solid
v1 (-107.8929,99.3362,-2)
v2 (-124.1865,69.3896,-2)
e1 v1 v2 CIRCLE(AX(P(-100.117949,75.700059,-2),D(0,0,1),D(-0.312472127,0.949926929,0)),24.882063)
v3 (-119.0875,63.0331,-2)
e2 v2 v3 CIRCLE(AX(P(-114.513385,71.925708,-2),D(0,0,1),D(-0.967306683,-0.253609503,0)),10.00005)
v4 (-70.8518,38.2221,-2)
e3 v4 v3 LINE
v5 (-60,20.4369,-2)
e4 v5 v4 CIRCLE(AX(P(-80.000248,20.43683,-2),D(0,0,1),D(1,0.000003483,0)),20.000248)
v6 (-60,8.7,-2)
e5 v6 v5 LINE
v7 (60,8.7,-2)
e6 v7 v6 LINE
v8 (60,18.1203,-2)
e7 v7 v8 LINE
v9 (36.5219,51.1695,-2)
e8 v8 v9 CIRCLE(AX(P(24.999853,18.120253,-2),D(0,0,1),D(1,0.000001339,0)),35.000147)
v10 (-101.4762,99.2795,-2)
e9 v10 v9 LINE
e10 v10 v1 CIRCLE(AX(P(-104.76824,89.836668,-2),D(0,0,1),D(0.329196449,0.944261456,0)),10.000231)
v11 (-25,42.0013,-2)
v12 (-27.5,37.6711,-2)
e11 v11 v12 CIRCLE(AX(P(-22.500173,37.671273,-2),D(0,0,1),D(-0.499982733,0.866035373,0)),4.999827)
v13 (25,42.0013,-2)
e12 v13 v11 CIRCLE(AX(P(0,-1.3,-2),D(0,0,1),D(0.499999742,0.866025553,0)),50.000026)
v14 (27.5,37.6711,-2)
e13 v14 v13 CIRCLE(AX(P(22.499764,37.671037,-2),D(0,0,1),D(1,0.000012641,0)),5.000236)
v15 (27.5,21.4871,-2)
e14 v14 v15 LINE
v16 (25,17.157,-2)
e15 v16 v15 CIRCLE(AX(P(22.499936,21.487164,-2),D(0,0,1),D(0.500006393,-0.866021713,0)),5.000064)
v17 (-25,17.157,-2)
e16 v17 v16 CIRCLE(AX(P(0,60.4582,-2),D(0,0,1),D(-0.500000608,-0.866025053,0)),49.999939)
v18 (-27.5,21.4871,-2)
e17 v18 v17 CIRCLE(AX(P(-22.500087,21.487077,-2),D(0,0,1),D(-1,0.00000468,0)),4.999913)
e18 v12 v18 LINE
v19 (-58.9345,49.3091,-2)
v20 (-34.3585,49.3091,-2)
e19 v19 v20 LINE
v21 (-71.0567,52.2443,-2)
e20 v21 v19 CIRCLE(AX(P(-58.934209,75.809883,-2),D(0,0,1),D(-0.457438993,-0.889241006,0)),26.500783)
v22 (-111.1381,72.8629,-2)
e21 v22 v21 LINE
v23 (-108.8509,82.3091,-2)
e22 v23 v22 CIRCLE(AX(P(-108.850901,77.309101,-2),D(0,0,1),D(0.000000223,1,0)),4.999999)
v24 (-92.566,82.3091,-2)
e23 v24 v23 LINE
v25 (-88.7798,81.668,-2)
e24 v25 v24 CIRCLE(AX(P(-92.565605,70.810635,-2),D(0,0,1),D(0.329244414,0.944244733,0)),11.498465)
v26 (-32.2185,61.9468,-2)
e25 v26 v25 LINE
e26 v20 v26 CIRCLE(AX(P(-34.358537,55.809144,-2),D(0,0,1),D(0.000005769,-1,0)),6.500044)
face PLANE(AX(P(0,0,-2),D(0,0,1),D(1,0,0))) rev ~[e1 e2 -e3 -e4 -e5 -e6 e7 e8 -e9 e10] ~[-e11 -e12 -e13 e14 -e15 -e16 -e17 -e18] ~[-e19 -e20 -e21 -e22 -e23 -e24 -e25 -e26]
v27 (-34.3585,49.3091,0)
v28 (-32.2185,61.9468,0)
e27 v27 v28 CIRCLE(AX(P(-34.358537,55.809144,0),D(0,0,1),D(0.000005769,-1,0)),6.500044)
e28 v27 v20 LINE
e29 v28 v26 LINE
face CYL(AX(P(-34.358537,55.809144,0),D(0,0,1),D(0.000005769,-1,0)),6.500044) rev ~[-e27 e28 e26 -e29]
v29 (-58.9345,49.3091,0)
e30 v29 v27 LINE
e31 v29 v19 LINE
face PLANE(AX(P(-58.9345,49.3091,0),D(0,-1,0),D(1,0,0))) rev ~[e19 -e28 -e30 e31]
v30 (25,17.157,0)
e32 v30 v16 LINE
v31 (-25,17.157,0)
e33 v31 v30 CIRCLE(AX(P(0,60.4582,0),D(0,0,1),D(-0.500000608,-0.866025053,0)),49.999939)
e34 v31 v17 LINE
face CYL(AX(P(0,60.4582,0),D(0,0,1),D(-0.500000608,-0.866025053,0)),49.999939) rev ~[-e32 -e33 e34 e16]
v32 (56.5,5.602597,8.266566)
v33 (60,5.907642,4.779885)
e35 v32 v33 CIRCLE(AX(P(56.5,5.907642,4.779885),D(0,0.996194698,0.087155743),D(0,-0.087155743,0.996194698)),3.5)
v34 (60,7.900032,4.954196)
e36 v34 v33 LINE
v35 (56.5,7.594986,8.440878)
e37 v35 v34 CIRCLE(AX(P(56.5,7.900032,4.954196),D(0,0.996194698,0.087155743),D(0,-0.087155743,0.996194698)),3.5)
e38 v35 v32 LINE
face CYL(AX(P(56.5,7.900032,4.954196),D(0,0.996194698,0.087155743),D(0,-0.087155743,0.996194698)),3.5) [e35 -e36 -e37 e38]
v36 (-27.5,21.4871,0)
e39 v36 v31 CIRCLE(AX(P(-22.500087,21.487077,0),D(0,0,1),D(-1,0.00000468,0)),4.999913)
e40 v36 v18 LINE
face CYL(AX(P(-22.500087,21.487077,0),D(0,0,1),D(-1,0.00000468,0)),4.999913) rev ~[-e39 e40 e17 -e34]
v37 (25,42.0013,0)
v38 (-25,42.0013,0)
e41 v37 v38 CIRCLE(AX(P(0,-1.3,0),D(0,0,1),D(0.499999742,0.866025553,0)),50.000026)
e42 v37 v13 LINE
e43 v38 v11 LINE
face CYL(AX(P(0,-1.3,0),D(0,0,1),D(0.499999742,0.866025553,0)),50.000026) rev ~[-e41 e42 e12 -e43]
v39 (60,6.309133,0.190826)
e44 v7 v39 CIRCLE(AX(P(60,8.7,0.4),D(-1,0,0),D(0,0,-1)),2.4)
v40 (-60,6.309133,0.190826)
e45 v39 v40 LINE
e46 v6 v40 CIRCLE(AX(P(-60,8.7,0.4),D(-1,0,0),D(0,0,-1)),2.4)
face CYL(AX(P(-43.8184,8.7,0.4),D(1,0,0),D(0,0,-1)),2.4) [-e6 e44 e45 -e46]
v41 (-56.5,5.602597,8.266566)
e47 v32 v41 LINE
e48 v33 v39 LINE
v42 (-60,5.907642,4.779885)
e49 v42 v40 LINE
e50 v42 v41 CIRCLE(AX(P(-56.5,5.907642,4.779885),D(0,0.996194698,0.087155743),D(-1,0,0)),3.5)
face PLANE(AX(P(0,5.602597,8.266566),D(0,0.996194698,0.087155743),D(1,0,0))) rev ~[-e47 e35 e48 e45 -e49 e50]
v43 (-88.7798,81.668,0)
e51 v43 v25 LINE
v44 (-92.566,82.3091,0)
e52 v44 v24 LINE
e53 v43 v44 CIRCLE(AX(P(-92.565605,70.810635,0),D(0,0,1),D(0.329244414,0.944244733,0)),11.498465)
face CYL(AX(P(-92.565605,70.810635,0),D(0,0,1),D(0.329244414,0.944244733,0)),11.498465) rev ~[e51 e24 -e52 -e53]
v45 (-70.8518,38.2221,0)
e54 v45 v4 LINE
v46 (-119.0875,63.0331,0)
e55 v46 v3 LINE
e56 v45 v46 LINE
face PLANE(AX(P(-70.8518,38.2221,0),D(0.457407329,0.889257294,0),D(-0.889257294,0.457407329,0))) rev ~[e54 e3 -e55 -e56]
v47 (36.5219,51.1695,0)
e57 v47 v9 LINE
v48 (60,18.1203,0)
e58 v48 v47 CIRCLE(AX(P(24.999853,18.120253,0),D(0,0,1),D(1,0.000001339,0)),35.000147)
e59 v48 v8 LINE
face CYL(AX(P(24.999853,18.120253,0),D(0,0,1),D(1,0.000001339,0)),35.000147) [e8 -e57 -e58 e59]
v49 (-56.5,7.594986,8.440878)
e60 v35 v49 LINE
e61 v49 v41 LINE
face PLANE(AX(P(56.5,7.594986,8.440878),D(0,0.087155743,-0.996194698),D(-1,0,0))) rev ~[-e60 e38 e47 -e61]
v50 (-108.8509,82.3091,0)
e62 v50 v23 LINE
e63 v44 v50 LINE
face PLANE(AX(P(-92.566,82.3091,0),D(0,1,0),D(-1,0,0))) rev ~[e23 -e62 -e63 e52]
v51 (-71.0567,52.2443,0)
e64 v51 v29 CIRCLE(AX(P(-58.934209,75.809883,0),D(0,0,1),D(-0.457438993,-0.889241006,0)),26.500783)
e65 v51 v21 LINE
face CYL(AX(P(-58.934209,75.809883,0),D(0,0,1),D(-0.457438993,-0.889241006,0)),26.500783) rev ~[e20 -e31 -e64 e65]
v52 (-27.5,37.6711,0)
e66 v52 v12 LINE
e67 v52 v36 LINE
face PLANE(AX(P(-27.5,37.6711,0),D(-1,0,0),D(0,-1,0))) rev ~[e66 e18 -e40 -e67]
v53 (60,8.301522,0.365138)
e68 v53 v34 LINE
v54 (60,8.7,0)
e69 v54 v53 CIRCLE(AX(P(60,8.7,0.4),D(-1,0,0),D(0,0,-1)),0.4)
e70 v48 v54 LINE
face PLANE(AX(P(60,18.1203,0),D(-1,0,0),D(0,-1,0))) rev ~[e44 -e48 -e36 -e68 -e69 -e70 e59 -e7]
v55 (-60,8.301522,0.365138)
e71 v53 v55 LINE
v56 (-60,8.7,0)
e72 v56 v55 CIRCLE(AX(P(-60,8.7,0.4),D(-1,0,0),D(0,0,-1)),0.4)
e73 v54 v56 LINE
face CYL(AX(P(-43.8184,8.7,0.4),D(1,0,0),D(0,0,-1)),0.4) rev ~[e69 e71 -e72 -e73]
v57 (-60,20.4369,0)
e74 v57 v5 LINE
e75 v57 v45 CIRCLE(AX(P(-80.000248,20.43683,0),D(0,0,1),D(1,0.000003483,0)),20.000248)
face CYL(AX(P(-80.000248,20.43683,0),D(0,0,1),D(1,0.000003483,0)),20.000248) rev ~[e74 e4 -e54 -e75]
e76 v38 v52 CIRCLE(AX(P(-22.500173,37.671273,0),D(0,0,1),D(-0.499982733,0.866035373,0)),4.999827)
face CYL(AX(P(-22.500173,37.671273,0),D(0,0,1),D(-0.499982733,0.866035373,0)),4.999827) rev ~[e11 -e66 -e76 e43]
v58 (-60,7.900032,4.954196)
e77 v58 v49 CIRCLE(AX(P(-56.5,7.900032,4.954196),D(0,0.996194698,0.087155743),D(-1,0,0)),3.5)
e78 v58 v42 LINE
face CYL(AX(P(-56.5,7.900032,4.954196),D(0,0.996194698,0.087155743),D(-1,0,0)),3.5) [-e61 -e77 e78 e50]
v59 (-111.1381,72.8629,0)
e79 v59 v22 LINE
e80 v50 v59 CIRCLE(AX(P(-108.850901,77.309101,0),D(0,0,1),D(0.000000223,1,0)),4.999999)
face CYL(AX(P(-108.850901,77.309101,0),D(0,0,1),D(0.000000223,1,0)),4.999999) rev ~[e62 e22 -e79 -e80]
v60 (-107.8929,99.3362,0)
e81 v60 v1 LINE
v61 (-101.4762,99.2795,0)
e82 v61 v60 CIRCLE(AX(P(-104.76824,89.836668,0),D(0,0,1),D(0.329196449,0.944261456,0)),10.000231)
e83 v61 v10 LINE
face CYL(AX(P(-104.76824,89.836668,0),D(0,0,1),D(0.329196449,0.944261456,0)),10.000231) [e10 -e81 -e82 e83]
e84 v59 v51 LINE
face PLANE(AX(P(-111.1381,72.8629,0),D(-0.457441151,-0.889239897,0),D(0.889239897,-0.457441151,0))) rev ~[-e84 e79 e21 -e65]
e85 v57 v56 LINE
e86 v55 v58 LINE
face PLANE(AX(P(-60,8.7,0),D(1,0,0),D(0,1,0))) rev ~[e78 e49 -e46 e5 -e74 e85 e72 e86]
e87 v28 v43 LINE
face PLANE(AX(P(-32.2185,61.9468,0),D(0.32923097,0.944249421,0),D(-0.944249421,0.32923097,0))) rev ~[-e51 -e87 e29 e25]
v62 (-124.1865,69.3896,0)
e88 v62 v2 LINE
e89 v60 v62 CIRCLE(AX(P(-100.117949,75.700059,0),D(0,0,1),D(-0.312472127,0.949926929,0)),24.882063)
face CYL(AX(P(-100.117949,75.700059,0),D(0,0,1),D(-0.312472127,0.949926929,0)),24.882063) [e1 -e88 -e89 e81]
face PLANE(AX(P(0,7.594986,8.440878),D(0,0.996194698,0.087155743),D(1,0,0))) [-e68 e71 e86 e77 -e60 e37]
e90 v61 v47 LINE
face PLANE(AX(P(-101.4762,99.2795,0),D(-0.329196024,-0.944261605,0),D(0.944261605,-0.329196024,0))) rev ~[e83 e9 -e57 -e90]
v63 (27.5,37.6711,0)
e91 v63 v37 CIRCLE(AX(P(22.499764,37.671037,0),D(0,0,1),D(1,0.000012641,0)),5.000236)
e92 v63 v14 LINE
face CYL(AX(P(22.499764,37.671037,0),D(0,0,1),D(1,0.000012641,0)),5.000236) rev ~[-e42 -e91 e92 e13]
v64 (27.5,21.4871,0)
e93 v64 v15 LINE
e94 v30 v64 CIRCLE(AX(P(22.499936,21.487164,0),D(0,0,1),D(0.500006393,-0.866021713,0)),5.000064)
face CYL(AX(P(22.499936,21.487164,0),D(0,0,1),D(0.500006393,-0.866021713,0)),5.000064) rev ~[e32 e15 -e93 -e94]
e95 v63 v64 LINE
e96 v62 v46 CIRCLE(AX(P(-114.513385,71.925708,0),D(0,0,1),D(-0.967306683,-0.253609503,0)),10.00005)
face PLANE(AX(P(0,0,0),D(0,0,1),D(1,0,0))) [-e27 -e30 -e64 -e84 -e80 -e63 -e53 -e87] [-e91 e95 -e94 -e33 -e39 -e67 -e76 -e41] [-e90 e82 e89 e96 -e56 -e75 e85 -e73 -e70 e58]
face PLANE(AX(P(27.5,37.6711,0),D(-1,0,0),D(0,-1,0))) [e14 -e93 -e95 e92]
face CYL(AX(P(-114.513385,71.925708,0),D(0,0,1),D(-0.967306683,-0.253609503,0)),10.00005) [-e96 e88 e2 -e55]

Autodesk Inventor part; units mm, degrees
ref_plane "YZ Plane" through (0, 0, 0) normal (1, 0, 0) x (0, 1, 0)
ref_plane "XZ Plane" through (0, 0, 0) normal (0, 1, 0) x (-1, 0, 0)
ref_plane "XY Plane" through (0, 0, 0) normal (0, 0, 1) x (1, 0, 0)
sketch "草圖1" plane through (0, 0, 0) normal (0, 0, 1) x (1, 0, 0)
  line L0 (0, 0) -> (-40.5681, 0) construction
  line L1 (0, 0) -> (0, 45.2738) construction
  line L2 (-60, 18.7) -> (-21.9145, 18.7) construction
  line L3 (60, 18.1203) -> (60, 3.5)
  line L4 (56.5, 0) -> (-56.5, 0)
  line L5 (-60, 3.5) -> (-60, 18.7)
  line L6 (-87.6368, 8.7) -> (76.2221, 8.7)
  arc A0 (-60, 3.5) -> (-56.5, 0) centre (-56.5, 3.5) ccw
  arc A1 (56.5, 0) -> (60, 3.5) centre (56.5, 3.5) ccw
  arc A2 (-25, 17.157) -> (25, 17.157) centre (0, 60.4582) ccw
  line L7 (-27.5, 18.7) -> (27.5, 18.7) construction
  line L8 (16.8799, 18.7) -> (60, 18.7) construction
  line L9 (-60, 18.7) -> (-60, 20.4369)
  line L10 (-70.8518, 38.2221) -> (-119.0875, 63.0331)
  line L11 (-101.4762, 99.2795) -> (36.5219, 51.1695)
  arc A3 (-107.8929, 99.3362) -> (-124.1865, 69.3896) centre (-100.1179, 75.7) ccw
  line L12 (-104.2307, 100.2398) -> (-122.4731, 64.7746) construction
  line L13 (-92.566, 80.8091) -> (-108.8509, 80.8091)
  arc A4 (-89.2737, 80.2516) -> (-92.566, 80.8091) centre (-92.566, 70.8091) ccw
  line L14 (-32.7123, 60.5304) -> (-89.2737, 80.2516)
  arc A5 (-108.8509, 80.8091) -> (-110.452, 74.1968) centre (-108.8509, 77.3091) ccw
  line L15 (-110.452, 74.1968) -> (-70.3705, 53.5781)
  arc A6 (-70.3705, 53.5781) -> (-58.9345, 50.8091) centre (-58.9345, 75.8091) ccw
  line L16 (-58.9345, 50.8091) -> (-34.3585, 50.8091)
  arc A7 (-34.3585, 50.8091) -> (-32.7123, 60.5304) centre (-34.3585, 55.8091) ccw
  arc A8 (-88.7798, 81.668) -> (-92.566, 82.3091) centre (-92.566, 70.8091) ccw
  line L17 (-92.566, 82.3091) -> (-108.8509, 82.3091)
  arc A9 (-108.8509, 82.3091) -> (-111.1381, 72.8629) centre (-108.8509, 77.3091) ccw
  line L18 (-111.1381, 72.8629) -> (-71.0567, 52.2443)
  arc A10 (-71.0567, 52.2443) -> (-58.9345, 49.3091) centre (-58.9345, 75.8091) ccw
  line L19 (-58.9345, 49.3091) -> (-34.3585, 49.3091)
  arc A11 (-34.3585, 49.3091) -> (-32.2185, 61.9468) centre (-34.3585, 55.8091) ccw
  line L20 (-32.2185, 61.9468) -> (-88.7798, 81.668)
  arc A12 (-101.4762, 99.2795) -> (-107.8929, 99.3362) centre (-104.7682, 89.8369) ccw
  arc A13 (-124.1865, 69.3896) -> (-119.0875, 63.0331) centre (-114.5134, 71.9257) ccw
  arc A14 (25, 42.0013) -> (-25, 42.0013) centre (0, -1.3) ccw
  line L21 (-27.5, 37.6711) -> (-27.5, 21.4871)
  line L22 (27.5, 37.6711) -> (27.5, 21.4871)
  arc A15 (27.5, 37.6711) -> (25, 42.0013) centre (22.5, 37.6711) ccw
  arc A16 (25, 17.157) -> (27.5, 21.4871) centre (22.5, 21.4871) ccw
  arc A17 (-27.5, 21.4871) -> (-25, 17.157) centre (-22.5, 21.4871) ccw
  arc A18 (-25, 42.0013) -> (-27.5, 37.6711) centre (-22.5, 37.6711) ccw
  arc A19 (-60, 20.4369) -> (-70.8518, 38.2221) centre (-80, 20.4369) ccw
  arc A20 (60, 18.1203) -> (36.5219, 51.1695) centre (25, 18.1203) ccw
  point P0 (0, 0)
  point P1 (60, 42.9843)
  point P2 (-60, 40.3647)
  point P3 (-60, 32.6402)
  point P4 (27.5, 40.4582)
  point P5 (-27.5, 40.4582)
  point P6 (0, 18.7)
  dimension "d0" = 120
  dimension "d1" = 3.5
  dimension "d2" = 8.7
  dimension "d3" = 10
  dimension "d9" = 1.7582
  dimension "d12" = 117.22
  dimension "d14" = 8
  dimension "d16" = 24.8821
  dimension "d19" = 1.5
  dimension "d20" = 65
  dimension "d21" = 10
  dimension "d22" = 10
  dimension "d23" = 50
  dimension "d24" = 30
  dimension "d25" = 5
  dimension "d26" = 55
  dimension "d27" = 57
  dimension "d28" = 20
  dimension "d29" = 35
  dimension "d30" = 81.1369
extrude "擠出1" add sketch "草圖1" against normal blind 2 contours L3 L6 L5 L9 A19 L10 A13 A3 A12 L11 A20 | L3 A1 L4 A0 L5 L6
bend part "折彎零件1" radius 0.4 angle 85 line through (-87.6368, 8.7, 0) along (1, 0, 0) centre toward (0, 0, 1) moving side (0, -1, 0) both sides no
equation "\"折彎半徑\" = 厚度"
equation "\"折彎離隙寬度\" = 厚度"
equation "\"折彎離隙深度\" = 0.5 * 厚度"
equation "\"轉角離隙大小\" = 4 * 厚度"
equation "\"最小剩餘\" = 2 * 厚度"
equation "\"轉移半徑\" = 折彎半徑"
equation "\"Jacobi半徑大小\" = 折彎半徑"
equation "\"間隙大小\" = 厚度"
equation "\"厚度\" = 2"
properties part number "0 零件" material "不鏽鋼"
